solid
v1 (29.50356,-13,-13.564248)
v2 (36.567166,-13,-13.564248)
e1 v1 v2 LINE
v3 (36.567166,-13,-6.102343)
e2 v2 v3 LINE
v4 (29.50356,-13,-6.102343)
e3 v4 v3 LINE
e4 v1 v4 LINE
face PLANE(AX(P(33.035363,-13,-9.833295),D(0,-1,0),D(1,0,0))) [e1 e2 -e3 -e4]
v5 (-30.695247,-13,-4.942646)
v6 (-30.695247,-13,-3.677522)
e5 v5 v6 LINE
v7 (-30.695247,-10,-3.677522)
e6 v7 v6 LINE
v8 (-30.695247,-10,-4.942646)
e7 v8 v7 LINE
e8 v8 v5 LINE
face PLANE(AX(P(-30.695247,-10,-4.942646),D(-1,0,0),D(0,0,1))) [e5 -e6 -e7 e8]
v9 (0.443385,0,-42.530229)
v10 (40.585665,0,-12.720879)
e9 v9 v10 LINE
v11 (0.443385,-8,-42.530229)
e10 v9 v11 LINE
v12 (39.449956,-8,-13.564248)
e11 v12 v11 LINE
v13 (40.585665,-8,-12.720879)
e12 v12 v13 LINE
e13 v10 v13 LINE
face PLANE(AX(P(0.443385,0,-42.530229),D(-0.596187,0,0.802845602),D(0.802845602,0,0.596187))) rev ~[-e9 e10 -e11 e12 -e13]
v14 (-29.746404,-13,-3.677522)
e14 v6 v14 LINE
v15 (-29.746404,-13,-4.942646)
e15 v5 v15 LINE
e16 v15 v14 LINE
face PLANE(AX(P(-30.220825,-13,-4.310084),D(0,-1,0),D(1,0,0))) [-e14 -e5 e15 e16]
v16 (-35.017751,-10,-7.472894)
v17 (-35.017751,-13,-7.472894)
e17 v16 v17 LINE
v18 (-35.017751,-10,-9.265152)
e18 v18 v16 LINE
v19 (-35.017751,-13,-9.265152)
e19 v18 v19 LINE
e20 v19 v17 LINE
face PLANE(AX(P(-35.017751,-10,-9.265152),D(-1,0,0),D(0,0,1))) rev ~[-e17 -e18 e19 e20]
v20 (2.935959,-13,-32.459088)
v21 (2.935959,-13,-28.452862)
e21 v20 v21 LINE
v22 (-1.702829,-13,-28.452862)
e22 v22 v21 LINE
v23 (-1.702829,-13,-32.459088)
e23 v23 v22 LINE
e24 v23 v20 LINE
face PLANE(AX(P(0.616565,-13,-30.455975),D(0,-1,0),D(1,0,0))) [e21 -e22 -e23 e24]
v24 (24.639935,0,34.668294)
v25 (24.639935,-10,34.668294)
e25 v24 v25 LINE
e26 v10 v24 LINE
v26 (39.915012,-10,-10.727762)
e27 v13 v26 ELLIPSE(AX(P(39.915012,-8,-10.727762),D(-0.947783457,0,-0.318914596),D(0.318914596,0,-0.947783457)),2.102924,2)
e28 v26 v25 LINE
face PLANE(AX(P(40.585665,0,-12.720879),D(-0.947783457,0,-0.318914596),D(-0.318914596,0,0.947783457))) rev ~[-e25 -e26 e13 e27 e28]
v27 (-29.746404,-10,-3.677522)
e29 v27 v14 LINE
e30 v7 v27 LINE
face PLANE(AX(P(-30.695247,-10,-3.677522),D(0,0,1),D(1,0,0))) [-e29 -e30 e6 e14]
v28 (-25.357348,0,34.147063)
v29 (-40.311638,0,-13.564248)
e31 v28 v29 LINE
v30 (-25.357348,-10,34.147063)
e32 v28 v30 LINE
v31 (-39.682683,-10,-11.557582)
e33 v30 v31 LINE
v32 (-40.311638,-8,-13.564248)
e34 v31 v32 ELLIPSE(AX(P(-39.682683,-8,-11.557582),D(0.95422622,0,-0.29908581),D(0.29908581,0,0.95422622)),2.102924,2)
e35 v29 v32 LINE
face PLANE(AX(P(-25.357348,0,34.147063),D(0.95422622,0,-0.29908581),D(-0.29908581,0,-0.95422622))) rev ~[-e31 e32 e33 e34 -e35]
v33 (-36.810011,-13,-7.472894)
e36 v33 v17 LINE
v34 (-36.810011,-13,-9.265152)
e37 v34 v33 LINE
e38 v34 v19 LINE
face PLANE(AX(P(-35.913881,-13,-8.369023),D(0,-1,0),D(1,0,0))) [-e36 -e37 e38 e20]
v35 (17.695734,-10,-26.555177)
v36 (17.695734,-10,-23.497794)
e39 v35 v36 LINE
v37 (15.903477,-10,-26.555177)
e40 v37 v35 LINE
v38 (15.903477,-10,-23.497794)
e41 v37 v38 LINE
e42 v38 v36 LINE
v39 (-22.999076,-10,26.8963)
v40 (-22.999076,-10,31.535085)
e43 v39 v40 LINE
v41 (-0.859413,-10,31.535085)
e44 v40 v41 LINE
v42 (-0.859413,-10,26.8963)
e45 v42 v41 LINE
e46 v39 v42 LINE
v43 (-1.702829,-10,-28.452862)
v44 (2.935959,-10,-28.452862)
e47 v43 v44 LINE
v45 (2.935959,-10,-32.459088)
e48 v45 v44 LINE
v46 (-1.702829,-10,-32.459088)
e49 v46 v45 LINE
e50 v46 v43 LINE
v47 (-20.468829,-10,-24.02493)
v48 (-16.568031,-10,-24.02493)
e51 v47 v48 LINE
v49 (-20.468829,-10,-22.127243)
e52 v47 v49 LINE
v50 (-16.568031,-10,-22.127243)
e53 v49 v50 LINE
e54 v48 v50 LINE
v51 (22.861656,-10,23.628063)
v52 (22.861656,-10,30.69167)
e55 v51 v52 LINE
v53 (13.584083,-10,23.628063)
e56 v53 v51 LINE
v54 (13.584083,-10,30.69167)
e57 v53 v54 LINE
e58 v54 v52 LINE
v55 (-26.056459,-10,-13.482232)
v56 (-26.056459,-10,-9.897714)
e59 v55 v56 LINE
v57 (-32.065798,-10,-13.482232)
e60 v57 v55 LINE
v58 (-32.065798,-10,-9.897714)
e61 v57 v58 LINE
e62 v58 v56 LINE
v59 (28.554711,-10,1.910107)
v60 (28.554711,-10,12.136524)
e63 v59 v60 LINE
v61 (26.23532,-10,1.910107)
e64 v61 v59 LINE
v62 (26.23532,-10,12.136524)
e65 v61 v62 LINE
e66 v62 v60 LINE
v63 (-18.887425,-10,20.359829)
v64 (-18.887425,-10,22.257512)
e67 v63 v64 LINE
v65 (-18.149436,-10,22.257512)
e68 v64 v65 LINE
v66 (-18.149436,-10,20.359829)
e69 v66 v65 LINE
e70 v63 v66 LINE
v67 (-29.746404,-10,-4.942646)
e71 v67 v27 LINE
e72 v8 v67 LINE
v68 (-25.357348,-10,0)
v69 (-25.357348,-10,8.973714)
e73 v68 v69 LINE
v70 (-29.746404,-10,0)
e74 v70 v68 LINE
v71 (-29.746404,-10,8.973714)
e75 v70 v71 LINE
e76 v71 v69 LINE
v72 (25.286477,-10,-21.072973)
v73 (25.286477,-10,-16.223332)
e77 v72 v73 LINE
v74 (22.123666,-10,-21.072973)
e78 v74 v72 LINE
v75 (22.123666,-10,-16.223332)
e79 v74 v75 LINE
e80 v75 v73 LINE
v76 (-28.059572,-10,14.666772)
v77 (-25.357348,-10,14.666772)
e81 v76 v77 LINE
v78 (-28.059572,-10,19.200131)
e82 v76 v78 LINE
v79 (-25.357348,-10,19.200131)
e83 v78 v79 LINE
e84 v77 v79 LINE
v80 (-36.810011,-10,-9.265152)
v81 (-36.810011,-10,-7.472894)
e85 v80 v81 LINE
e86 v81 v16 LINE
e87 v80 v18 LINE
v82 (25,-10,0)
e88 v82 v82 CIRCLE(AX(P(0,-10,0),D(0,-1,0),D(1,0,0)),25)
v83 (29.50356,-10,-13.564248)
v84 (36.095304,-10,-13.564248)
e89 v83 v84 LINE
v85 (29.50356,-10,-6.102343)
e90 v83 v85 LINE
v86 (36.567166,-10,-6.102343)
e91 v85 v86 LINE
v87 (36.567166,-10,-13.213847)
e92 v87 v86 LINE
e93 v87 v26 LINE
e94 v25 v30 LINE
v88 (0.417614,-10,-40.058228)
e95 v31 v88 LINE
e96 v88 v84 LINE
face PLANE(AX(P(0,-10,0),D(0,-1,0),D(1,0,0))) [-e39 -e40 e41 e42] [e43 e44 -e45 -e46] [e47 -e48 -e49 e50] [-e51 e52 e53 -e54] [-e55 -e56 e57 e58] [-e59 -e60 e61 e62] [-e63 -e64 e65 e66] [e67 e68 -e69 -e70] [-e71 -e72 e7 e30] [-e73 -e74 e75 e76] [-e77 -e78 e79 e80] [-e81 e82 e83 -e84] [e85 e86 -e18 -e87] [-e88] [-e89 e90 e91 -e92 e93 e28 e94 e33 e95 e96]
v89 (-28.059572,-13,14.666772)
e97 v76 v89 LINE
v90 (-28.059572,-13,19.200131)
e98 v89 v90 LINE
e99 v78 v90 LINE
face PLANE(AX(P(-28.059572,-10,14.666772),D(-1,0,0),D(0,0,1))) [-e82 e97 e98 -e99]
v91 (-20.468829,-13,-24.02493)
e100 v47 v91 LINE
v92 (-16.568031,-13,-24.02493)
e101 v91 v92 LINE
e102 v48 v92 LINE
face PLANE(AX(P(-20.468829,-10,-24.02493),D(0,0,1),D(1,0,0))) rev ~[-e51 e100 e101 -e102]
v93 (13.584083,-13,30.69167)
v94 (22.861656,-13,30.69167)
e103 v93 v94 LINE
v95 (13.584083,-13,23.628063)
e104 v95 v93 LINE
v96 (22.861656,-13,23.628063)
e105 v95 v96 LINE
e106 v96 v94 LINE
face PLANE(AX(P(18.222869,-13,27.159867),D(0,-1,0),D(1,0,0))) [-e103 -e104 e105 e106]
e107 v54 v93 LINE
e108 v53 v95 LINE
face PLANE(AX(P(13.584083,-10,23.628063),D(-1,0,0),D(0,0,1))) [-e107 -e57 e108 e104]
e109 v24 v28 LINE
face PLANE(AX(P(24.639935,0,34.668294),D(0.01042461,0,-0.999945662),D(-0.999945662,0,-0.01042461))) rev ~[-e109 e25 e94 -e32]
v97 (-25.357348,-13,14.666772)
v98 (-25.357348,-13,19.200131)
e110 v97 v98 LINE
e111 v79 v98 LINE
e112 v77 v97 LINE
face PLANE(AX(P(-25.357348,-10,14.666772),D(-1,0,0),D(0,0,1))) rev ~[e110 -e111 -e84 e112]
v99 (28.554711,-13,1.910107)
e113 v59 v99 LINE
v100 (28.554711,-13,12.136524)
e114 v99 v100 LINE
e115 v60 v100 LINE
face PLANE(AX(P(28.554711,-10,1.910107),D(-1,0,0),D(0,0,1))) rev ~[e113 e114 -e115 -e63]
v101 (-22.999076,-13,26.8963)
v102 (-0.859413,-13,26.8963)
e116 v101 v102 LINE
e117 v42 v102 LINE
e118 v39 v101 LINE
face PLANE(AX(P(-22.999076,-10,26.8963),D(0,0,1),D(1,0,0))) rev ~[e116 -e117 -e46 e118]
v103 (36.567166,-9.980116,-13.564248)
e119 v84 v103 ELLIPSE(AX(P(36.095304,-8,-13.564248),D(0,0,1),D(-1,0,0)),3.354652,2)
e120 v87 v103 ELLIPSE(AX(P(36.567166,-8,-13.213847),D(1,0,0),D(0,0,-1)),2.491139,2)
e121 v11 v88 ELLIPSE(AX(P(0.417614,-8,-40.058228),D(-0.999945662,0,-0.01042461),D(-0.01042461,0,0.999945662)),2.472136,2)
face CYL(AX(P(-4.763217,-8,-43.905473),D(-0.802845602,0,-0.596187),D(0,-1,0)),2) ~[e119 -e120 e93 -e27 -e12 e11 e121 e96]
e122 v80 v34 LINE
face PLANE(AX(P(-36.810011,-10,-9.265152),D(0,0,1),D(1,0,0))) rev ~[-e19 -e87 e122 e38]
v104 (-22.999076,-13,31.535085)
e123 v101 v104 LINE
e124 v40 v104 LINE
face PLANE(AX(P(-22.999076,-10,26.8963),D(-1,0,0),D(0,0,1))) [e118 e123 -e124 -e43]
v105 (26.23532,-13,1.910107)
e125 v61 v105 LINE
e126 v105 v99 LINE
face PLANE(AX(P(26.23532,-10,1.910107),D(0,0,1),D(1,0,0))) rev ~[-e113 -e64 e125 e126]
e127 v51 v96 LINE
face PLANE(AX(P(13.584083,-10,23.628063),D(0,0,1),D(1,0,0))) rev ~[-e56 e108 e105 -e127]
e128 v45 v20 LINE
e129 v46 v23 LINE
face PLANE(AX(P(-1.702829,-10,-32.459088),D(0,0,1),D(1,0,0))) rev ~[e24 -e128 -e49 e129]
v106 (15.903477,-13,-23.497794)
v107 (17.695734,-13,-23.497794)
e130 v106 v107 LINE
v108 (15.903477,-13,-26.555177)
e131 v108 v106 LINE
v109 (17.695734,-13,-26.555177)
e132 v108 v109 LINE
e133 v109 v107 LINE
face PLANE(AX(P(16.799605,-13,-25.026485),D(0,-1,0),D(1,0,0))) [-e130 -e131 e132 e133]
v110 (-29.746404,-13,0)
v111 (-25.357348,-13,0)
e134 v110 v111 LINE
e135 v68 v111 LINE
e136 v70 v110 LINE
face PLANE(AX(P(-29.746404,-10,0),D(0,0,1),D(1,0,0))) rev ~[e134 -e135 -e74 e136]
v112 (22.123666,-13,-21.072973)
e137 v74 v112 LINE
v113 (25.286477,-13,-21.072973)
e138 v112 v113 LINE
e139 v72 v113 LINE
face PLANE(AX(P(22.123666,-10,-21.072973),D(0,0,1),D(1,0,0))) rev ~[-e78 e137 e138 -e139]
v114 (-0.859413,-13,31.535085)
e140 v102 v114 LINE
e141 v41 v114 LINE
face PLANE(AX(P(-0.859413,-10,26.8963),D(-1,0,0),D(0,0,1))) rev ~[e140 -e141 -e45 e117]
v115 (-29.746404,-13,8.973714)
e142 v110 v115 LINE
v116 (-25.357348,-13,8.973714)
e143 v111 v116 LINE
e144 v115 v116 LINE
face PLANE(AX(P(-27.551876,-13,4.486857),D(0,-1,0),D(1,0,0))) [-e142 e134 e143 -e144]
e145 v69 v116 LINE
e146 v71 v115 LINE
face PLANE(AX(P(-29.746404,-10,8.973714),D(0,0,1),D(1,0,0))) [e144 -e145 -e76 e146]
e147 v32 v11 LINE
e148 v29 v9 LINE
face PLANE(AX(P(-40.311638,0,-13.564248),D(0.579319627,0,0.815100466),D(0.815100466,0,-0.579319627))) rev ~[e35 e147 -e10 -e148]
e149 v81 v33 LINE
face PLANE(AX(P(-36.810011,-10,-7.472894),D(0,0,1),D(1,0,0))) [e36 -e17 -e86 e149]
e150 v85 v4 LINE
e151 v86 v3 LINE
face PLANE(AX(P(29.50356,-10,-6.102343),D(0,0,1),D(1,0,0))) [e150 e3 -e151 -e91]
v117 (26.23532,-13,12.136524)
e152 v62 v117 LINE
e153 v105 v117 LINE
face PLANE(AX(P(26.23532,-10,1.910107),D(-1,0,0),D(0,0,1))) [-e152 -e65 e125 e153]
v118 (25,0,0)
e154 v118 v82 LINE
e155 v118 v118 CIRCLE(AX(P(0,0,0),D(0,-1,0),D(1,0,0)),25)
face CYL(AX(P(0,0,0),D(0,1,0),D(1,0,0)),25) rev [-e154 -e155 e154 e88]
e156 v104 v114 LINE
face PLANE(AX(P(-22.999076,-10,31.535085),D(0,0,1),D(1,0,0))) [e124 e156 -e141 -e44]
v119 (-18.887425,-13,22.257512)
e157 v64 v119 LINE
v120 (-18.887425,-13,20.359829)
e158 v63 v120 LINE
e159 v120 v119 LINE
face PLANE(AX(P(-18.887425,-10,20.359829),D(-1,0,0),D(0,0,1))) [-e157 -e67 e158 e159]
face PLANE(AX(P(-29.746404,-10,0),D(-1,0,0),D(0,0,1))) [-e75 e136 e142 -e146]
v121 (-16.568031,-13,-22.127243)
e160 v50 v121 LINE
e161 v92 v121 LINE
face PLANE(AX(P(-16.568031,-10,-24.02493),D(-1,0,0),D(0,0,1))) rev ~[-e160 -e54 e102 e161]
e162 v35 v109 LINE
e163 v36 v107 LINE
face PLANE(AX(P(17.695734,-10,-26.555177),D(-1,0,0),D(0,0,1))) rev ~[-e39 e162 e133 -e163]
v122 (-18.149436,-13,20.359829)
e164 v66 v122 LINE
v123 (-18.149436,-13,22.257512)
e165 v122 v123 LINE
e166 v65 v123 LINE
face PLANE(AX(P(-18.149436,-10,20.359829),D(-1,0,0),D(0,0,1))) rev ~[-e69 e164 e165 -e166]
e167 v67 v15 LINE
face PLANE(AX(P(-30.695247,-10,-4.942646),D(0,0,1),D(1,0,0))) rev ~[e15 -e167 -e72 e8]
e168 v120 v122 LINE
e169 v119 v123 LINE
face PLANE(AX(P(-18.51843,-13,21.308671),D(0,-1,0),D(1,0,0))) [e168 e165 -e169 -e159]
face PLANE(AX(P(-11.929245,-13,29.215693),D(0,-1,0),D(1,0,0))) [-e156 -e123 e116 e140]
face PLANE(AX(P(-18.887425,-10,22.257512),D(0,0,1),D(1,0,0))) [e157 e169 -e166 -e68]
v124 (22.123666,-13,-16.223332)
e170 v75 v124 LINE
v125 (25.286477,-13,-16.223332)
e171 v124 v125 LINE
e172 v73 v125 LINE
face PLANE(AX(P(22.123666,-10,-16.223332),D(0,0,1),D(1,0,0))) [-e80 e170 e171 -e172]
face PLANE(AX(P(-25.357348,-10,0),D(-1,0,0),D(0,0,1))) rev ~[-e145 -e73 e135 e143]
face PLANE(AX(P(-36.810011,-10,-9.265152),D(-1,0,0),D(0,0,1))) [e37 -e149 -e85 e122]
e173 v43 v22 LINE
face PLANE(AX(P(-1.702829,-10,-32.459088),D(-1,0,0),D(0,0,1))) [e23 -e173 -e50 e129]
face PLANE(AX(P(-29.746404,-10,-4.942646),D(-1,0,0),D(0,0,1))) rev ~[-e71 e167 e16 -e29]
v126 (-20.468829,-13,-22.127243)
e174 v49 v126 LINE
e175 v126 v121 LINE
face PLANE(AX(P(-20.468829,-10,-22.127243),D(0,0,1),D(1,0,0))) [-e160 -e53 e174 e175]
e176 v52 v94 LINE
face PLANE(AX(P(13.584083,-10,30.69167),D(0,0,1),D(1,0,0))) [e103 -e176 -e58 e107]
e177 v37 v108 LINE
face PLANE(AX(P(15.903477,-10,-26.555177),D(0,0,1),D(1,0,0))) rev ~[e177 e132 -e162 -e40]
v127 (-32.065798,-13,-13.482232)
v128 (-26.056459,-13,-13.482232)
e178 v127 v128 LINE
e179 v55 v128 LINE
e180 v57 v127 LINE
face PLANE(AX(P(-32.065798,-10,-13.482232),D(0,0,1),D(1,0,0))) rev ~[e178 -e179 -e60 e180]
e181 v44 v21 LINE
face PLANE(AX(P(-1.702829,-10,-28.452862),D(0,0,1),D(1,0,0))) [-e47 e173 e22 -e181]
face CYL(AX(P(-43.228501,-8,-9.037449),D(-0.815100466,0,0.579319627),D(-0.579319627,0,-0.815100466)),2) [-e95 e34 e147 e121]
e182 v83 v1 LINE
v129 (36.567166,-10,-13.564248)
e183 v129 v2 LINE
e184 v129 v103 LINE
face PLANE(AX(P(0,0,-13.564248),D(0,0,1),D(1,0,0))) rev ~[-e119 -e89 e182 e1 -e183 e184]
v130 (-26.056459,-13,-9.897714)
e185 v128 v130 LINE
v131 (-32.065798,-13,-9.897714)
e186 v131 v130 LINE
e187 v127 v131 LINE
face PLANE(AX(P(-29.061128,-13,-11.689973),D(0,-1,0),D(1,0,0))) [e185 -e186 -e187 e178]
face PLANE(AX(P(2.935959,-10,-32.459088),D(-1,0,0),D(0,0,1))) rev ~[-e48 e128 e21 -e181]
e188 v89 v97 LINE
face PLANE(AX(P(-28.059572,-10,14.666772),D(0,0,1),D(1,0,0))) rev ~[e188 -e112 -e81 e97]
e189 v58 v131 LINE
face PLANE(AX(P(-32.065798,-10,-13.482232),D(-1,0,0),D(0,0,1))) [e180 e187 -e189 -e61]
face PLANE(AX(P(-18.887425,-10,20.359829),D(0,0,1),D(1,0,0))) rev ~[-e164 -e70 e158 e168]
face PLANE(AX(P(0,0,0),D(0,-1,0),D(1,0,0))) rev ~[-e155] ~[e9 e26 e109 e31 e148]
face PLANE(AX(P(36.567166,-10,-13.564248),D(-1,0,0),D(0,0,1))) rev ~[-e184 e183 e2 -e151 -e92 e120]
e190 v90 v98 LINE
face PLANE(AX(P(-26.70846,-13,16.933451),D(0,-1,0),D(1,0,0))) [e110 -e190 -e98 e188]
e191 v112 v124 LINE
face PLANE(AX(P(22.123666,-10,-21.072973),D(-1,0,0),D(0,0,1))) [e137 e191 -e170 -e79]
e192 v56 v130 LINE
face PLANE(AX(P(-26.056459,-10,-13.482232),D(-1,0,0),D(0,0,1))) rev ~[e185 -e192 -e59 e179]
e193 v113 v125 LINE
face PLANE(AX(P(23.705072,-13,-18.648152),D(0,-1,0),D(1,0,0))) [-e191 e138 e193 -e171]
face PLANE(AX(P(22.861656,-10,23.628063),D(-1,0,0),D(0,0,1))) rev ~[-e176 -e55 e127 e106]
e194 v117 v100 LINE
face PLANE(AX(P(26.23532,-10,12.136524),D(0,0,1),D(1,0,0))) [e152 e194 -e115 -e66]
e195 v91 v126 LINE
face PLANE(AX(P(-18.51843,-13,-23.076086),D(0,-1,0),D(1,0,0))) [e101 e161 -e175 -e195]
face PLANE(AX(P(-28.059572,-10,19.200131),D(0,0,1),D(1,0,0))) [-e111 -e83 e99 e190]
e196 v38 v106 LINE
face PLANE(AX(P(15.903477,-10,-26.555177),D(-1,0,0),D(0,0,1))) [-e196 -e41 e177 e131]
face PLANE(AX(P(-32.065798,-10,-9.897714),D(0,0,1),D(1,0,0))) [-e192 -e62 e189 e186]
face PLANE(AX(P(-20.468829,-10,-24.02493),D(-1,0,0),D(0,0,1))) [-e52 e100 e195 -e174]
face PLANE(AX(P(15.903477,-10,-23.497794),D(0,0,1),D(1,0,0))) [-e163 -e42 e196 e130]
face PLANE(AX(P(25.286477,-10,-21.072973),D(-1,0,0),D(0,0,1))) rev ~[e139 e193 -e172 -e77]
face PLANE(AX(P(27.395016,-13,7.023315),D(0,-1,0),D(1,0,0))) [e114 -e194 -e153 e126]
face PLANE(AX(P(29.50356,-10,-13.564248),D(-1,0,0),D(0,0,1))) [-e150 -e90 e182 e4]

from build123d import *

# Parameters (mm, degrees)
F0_R         = 25
F1_DEPTH     = 10
F2_W         = 0.9488426149
F2_H         = 1.2651239522
F2_W_2       = 6.0093384236
F2_H_2       = 3.584517166
F2_W_3       = 3.9007980376
F2_H_3       = 1.8976870924
F2_W_4       = 4.6387878247
F2_H_4       = 4.0062256157
F2_W_5       = 1.7922576517
F2_H_5       = 3.0573830009
F2_W_6       = 7.0636067539
F2_H_6       = 7.4619053196
F2_W_7       = 3.1628105789
F2_H_7       = 4.8496406525
F2_W_8       = 2.3193918169
F2_H_8       = 10.2264162851
F2_W_9       = 9.2775728554
F2_H_9       = 7.0636067539
F2_W_10      = 22.1396633424
F2_H_10      = 4.6387854964
F2_W_11      = 2.7022243196
F2_H_11      = 4.5333597809
F2_W_12      = 0.7379893214
F2_H_12      = 1.8976833671
F2_W_13      = 4.3890562559
F2_H_13      = 8.9737139642
F2_W_14      = 1.7922595143
F2_H_14      = 1.7922581173
F3_DEPTH     = 3
F4_T1_DEPTH  = 60
F4_T6_DEPTH  = 60
F4_T12_DEPTH = 60
F4_T18_DEPTH = 60


# Not quite as in the source:
# - a fillet or chamfer that OpenCascade refuses, or shapes differently, is made with other operations: its cross-section is extruded or revolved along the edge and cut away or added


with BuildPart() as f1:
    # F0 (on Front) → F1 (new body)
    with BuildSketch(Plane.XZ):
        Polygon((-25.3573476618, 34.1470630352), (-40.3116381718, -13.5642479438), (0.4433851295, -42.5302292964), (40.5856652519, -12.7208793106), (24.6399354522, 34.6682935156), align=None)
        Circle(F0_R, mode=Mode.SUBTRACT)
    extrude(amount=F1_DEPTH)

    # F2 (on face) → F3 (join)
    with BuildSketch(Plane.XZ.offset(10)):
        with Locations((-30.2208252251, -4.310084274)):
            Rectangle(F2_W, F2_H)
        with Locations((-29.0611283854, -11.6899730638)):
            Rectangle(F2_W_2, F2_H_2)
        with Locations((-18.5184301808, -23.0760863051)):
            Rectangle(F2_W_3, F2_H_3)
        with Locations((0.6165653467, -30.455974862)):
            Rectangle(F2_W_4, F2_H_4)
        with Locations((16.7996054515, -25.0264853239)):
            Rectangle(F2_W_5, F2_H_5)
        with Locations((33.0353630707, -9.833295284)):
            Rectangle(F2_W_6, F2_H_6)
        with Locations((23.7050717697, -18.6481522396)):
            Rectangle(F2_W_7, F2_H_7)
        with Locations((27.3950155824, 7.0233154693)):
            Rectangle(F2_W_8, F2_H_8)
        with Locations((18.2228693739, 27.1598668769)):
            Rectangle(F2_W_9, F2_H_9)
        with Locations((-11.9292445015, 29.2156925425)):
            Rectangle(F2_W_10, F2_H_10)
        with Locations((-26.7084598216, 16.9334514067)):
            Rectangle(F2_W_11, F2_H_11)
        with Locations((-18.5184301808, 21.3086707518)):
            Rectangle(F2_W_12, F2_H_12)
        with Locations((-27.5518757897, 4.4868569821)):
            Rectangle(F2_W_13, F2_H_13)
        with Locations((-35.9138809144, -8.3690227475)):
            Rectangle(F2_W_14, F2_H_14)
    extrude(amount=F3_DEPTH)

    # F4: fillet of radius 2 on 2 edges, made by hand

    # F4_s2 → F4_t1 (cut)
    with BuildSketch(Plane(origin=(-24.4530139807, 0, 17.3795888115), x_dir=(0, 1, 0), z_dir=(0.815100466, 0, -0.5793196271))):
        with BuildLine():
            ThreePointArc((-8, -34.4095480118), (-9.4142135624, -33.8237615742), (-10, -32.4095480118))
            Line((-10, -32.4095480118), (-10, -34.4095480118))
            Line((-10, -34.4095480118), (-8, -34.4095480118))
        make_face()
    extrude(amount=F4_T1_DEPTH, mode=Mode.SUBTRACT)


with BuildPart() as f4_tool4:
    # F4_s5 → F4_t6 (new body)
    with BuildSketch(Plane(origin=(-24.0853680735, 0, -17.8856099914), x_dir=(0, 1, 0), z_dir=(0.8028456024, 0, 0.5961869997))):
        with BuildLine():
            ThreePointArc((-10, -32.4095480118), (-9.4142135624, -33.8237615742), (-8, -34.4095480118))
            Line((-8, -34.4095480118), (-10, -34.4095480118))
            Line((-10, -34.4095480118), (-10, -32.4095480118))
        make_face()
    extrude(amount=F4_T6_DEPTH)

    split(bisect_by=Plane.XY.offset(-13.5642479438), keep=Keep.BOTTOM)

    split(bisect_by=Plane.YZ.offset(36.5671664476), keep=Keep.BOTTOM)


with BuildPart() as f1_1:
    add(f1.part)

    # F4_t3: cut F4_tool4
    add(f4_tool4.part, mode=Mode.SUBTRACT)


with BuildPart() as f4_tool10:
    # F4_s11 → F4_t12 (new body)
    with BuildSketch(Plane(origin=(-24.0853680735, 0, -17.8856099914), x_dir=(0, 1, 0), z_dir=(0.8028456024, 0, 0.5961869997))):
        with BuildLine():
            ThreePointArc((-10, -32.4095480118), (-9.4142135624, -33.8237615742), (-8, -34.4095480118))
            Line((-8, -34.4095480118), (-10, -34.4095480118))
            Line((-10, -34.4095480118), (-10, -32.4095480118))
        make_face()
    extrude(amount=F4_T12_DEPTH)

    split(bisect_by=Plane.XY.offset(-13.5642479438), keep=Keep.BOTTOM)

    split(bisect_by=Plane.YZ.offset(36.5671664476), keep=Keep.TOP)


with BuildPart() as f1_2:
    add(f1_1.part)

    # F4_t9: cut F4_tool10
    add(f4_tool10.part, mode=Mode.SUBTRACT)


with BuildPart() as f4_tool16:
    # F4_s17 → F4_t18 (new body)
    with BuildSketch(Plane(origin=(-24.0853680735, 0, -17.8856099914), x_dir=(0, 1, 0), z_dir=(0.8028456024, 0, 0.5961869997))):
        with BuildLine():
            ThreePointArc((-10, -32.4095480118), (-9.4142135624, -33.8237615742), (-8, -34.4095480118))
            Line((-8, -34.4095480118), (-10, -34.4095480118))
            Line((-10, -34.4095480118), (-10, -32.4095480118))
        make_face()
    extrude(amount=F4_T18_DEPTH)

    split(bisect_by=Plane.XY.offset(-13.5642479438), keep=Keep.TOP)

    split(bisect_by=Plane.YZ.offset(36.5671664476), keep=Keep.TOP)


with BuildPart() as f1_3:
    add(f1_2.part)

    # F4_t15: cut F4_tool16
    add(f4_tool16.part, mode=Mode.SUBTRACT)


solid = f1_3.part
